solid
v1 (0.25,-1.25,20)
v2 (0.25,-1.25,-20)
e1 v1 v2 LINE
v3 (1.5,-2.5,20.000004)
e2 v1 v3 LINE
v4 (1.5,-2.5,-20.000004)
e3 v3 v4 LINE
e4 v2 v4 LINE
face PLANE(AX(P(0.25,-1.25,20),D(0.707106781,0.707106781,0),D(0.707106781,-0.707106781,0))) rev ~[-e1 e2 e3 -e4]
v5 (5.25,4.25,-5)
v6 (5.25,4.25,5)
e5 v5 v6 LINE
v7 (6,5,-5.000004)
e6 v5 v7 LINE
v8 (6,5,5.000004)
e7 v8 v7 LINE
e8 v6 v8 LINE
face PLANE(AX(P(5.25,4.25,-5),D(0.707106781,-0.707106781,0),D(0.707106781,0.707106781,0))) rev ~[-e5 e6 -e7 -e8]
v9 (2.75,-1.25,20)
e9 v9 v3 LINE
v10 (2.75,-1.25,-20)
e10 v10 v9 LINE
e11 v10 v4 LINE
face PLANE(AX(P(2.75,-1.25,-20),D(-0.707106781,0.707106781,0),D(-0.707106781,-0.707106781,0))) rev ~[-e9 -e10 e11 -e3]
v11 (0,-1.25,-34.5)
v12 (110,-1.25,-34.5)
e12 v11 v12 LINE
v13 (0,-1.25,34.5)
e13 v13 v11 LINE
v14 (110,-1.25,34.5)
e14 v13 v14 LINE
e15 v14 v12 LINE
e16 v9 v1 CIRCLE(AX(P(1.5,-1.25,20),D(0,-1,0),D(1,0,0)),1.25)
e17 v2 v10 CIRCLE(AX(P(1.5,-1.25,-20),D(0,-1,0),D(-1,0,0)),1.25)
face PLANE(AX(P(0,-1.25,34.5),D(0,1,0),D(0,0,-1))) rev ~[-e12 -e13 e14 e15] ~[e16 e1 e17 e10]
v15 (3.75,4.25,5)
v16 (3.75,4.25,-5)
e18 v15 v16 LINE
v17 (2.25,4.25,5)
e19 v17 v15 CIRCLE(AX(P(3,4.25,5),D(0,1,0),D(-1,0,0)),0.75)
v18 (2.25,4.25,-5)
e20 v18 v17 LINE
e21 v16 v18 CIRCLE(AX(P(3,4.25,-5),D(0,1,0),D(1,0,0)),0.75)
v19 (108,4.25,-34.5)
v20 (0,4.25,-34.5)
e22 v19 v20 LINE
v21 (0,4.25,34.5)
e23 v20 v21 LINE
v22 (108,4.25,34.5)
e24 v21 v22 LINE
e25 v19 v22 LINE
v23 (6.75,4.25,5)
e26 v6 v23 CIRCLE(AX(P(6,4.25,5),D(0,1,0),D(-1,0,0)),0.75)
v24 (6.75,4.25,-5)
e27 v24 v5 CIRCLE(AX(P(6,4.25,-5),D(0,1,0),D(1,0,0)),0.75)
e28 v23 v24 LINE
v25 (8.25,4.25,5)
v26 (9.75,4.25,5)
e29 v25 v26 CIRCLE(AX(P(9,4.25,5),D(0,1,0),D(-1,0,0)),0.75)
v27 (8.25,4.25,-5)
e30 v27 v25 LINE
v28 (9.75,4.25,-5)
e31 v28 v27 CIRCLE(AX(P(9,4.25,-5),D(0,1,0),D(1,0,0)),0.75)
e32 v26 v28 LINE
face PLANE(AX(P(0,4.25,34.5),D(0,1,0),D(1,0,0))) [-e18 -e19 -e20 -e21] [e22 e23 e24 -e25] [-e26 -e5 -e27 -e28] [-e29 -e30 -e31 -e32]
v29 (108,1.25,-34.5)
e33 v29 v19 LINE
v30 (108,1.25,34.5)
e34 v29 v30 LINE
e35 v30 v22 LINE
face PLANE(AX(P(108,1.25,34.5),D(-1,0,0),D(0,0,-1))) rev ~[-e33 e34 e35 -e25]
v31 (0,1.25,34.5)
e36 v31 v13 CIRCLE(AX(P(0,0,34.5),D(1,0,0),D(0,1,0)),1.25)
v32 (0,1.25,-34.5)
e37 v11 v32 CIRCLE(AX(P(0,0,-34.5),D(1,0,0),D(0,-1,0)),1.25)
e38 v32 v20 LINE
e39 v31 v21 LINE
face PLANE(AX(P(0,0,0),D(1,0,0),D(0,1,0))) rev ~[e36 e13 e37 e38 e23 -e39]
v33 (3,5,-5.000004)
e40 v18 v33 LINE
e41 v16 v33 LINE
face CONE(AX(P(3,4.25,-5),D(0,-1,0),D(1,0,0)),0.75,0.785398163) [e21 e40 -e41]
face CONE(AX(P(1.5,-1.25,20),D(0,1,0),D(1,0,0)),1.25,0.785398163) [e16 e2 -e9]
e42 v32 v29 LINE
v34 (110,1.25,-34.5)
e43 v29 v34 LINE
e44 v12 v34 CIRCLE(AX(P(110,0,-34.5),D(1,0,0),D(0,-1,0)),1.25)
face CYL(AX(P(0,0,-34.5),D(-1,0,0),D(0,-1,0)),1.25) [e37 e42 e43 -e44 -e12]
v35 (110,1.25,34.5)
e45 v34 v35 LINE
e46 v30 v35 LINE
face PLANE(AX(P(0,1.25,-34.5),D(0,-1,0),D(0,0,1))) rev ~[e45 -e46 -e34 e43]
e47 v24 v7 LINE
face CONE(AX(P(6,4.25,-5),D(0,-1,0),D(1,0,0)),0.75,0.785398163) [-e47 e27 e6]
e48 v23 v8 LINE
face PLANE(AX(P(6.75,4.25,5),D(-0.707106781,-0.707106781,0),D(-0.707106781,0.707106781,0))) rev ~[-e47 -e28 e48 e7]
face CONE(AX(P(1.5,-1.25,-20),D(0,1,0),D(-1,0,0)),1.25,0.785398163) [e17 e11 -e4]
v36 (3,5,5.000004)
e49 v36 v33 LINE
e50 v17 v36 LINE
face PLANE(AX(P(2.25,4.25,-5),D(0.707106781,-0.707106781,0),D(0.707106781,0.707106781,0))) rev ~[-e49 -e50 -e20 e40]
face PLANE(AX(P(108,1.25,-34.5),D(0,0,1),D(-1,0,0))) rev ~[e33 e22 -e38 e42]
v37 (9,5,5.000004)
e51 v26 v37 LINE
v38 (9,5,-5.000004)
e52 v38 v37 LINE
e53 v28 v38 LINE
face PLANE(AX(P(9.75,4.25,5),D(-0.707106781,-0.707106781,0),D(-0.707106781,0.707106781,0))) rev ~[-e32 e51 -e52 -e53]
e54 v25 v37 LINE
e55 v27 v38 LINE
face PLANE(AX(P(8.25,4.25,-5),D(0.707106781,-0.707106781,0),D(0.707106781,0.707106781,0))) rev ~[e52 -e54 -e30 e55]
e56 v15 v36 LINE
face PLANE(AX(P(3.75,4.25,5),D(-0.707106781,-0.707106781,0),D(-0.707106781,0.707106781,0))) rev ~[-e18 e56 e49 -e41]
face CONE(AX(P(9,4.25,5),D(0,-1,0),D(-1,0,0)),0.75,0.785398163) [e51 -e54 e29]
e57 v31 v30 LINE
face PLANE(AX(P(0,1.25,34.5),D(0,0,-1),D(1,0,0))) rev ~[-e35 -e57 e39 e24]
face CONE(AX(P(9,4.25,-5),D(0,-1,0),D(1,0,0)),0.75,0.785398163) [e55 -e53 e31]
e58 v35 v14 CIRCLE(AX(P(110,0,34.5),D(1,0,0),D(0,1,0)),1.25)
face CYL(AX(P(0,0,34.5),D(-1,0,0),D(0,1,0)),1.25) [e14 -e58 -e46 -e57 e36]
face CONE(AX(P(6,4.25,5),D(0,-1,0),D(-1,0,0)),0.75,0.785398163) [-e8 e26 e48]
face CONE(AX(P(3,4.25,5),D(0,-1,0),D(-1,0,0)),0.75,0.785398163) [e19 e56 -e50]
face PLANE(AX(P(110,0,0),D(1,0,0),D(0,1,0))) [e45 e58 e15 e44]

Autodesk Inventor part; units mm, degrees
ref_plane "YZ Plane" through (0, 0, 0) normal (1, 0, 0) x (0, 1, 0)
ref_plane "XZ Plane" through (0, 0, 0) normal (0, 1, 0) x (-1, 0, 0)
ref_plane "XY Plane" through (0, 0, 0) normal (0, 0, 1) x (1, 0, 0)
sketch "Sketch1" plane through (0, 0, 0) normal (1, 0, 0) x (0, 1, 0)
  line L0 (0, 34.5) -> (0, -34.5) construction
  line L1 (-1.25, 34.5) -> (-1.25, -34.5)
  line L2 (1.25, -34.5) -> (1.25, 34.5)
  arc A0 (1.25, 34.5) -> (-1.25, 34.5) centre (0, 34.5) ccw
  arc A1 (-1.25, -34.5) -> (1.25, -34.5) centre (0, -34.5) ccw
  line L3 (0, 0) -> (69, 0) construction
  dimension "d0" = 34.5
  dimension "d1" = 90
  dimension "d2" = 2.5
sketch "Sketch1 outline for Extrusion1" plane through (0, 0, 0) normal (1, 0, 0) x (0, 1, 0)
  arc A0 (-1.25, -34.5) -> (1.25, -34.5) centre (0, -34.5) ccw
  line L0 (-1.25, 34.5) -> (-1.25, -34.5)
  arc A1 (1.25, 34.5) -> (-1.25, 34.5) centre (0, 34.5) ccw
  line L1 (1.25, -34.5) -> (1.25, 34.5)
extrude "Extrusion1" add sketch "Sketch1 outline for Extrusion1" along normal blind 110
sketch "Sketch2" plane through (0, 1.25, 34.5) normal (0, 1, 0) x (1, 0, 0)
  line L0 (0, 34.5) -> (108, 34.5)
  line L1 (0, 34.5) -> (108, 34.5) construction
  line L2 (108, 34.5) -> (108, 69)
  line L3 (108, 34.5) -> (108, 0)
  line L4 (110, 69) -> (110, 0) projected
  line L5 (108, 34.5) -> (142.5, 34.5) construction
  line L6 (108, 0) -> (108, 69)
  line L7 (108, 69) -> (0, 69)
  line L8 (0, 69) -> (0, 0)
  line L9 (0, 0) -> (108, 0)
  line L10 (110, 69) -> (110, 70.25) projected
  line L11 (0, 69) -> (0, 0) projected
  dimension "d5" = 108
  dimension "d6" = 0
  dimension "d7" = 34.5
  dimension "d8" = 34.5
  dimension "d9" = 90
sketch "Sketch2 outline for Extrusion2" plane through (0, 1.25, 34.5) normal (0, 1, 0) x (1, 0, 0)
  line L0 (108, 69) -> (0, 69)
  line L1 (108, 34.5) -> (108, 69)
  line L2 (108, 0) -> (108, 34.5)
  line L3 (0, 0) -> (108, 0)
  line L4 (0, 69) -> (0, 0)
extrude "Extrusion2" add sketch "Sketch2 outline for Extrusion2" along normal blind 3
sketch "Sketch3" plane through (0, 4.25, 34.5) normal (0, 1, 0) x (1, 0, 0)
  line L0 (0, 34.5) -> (3, 34.5)
  line L1 (3, 34.5) -> (6, 34.5)
  line L2 (6, 34.5) -> (9, 34.5)
  line L3 (9, 29.5) -> (9, 39.5) construction
  line L4 (9.75, 29.5) -> (9.75, 39.5)
  line L5 (8.25, 39.5) -> (8.25, 29.5)
  arc A0 (8.25, 29.5) -> (9.75, 29.5) centre (9, 29.5) ccw
  arc A1 (9.75, 39.5) -> (8.25, 39.5) centre (9, 39.5) ccw
  line L6 (9, 34.5) -> (19, 34.5) construction
  line L7 (6, 29.5) -> (6, 39.5) construction
  line L8 (6.75, 29.5) -> (6.75, 39.5)
  line L9 (5.25, 39.5) -> (5.25, 29.5)
  arc A2 (5.25, 29.5) -> (6.75, 29.5) centre (6, 29.5) ccw
  arc A3 (6.75, 39.5) -> (5.25, 39.5) centre (6, 39.5) ccw
  line L10 (3, 29.5) -> (3, 39.5) construction
  line L11 (3.75, 29.5) -> (3.75, 39.5)
  line L12 (2.25, 39.5) -> (2.25, 29.5)
  arc A4 (2.25, 29.5) -> (3.75, 29.5) centre (3, 29.5) ccw
  arc A5 (3.75, 39.5) -> (2.25, 39.5) centre (3, 39.5) ccw
  dimension "d12" = 3
  dimension "d13" = 3
  dimension "d14" = 3
  dimension "d15" = 180
  dimension "d16" = 5
  dimension "d17" = 90
  dimension "d18" = 1.5
  dimension "d19" = 5
  dimension "d20" = 1.5
  dimension "d21" = 5
  dimension "d22" = 1.5
sketch "Sketch3 outline for Extrusion3" plane through (0, 4.25, 34.5) normal (0, 1, 0) x (1, 0, 0)
  arc A0 (9.75, 39.5) -> (8.25, 39.5) centre (9, 39.5) ccw
  line L0 (9.75, 29.5) -> (9.75, 39.5)
  arc A1 (8.25, 29.5) -> (9.75, 29.5) centre (9, 29.5) ccw
  line L1 (8.25, 39.5) -> (8.25, 29.5)
  arc A2 (5.25, 29.5) -> (6.75, 29.5) centre (6, 29.5) ccw
  line L2 (5.25, 39.5) -> (5.25, 29.5)
  arc A3 (6.75, 39.5) -> (5.25, 39.5) centre (6, 39.5) ccw
  line L3 (6.75, 29.5) -> (6.75, 39.5)
  arc A4 (2.25, 29.5) -> (3.75, 29.5) centre (3, 29.5) ccw
  line L4 (2.25, 39.5) -> (2.25, 29.5)
  arc A5 (3.75, 39.5) -> (2.25, 39.5) centre (3, 39.5) ccw
  line L5 (3.75, 29.5) -> (3.75, 39.5)
extrude "Extrusion3" add sketch "Sketch3 outline for Extrusion3" along normal blind 2 draft -45
sketch "Sketch4" plane through (0, -1.25, -34.5) normal (0, -1, 0) x (1, 0, 0)
  line L0 (0, 34.5) -> (1.5, 34.5)
  line L1 (1.5, 14.5) -> (1.5, 54.5) construction
  line L2 (6, 39.5) -> (6, 29.5) projected
  line L3 (2.75, 14.5) -> (2.75, 54.5)
  line L4 (0.25, 54.5) -> (0.25, 14.5)
  arc A0 (0.25, 14.5) -> (2.75, 14.5) centre (1.5, 14.5) ccw
  arc A1 (2.75, 54.5) -> (0.25, 54.5) centre (1.5, 54.5) ccw
  line L5 (1.5, 34.5) -> (41.5, 34.5) construction
  dimension "d25" = 1.5
  dimension "d26" = 20
  dimension "d27" = 90
  dimension "d28" = 2.5
sketch "Sketch4 outline for Extrusion4" plane through (0, -1.25, -34.5) normal (0, -1, 0) x (1, 0, 0)
  arc A0 (2.75, 54.5) -> (0.25, 54.5) centre (1.5, 54.5) ccw
  line L0 (2.75, 14.5) -> (2.75, 54.5)
  arc A1 (0.25, 14.5) -> (2.75, 14.5) centre (1.5, 14.5) ccw
  line L1 (0.25, 54.5) -> (0.25, 14.5)
extrude "Extrusion4" add sketch "Sketch4 outline for Extrusion4" along normal blind 2 draft -45
properties part number "Case-Top"
